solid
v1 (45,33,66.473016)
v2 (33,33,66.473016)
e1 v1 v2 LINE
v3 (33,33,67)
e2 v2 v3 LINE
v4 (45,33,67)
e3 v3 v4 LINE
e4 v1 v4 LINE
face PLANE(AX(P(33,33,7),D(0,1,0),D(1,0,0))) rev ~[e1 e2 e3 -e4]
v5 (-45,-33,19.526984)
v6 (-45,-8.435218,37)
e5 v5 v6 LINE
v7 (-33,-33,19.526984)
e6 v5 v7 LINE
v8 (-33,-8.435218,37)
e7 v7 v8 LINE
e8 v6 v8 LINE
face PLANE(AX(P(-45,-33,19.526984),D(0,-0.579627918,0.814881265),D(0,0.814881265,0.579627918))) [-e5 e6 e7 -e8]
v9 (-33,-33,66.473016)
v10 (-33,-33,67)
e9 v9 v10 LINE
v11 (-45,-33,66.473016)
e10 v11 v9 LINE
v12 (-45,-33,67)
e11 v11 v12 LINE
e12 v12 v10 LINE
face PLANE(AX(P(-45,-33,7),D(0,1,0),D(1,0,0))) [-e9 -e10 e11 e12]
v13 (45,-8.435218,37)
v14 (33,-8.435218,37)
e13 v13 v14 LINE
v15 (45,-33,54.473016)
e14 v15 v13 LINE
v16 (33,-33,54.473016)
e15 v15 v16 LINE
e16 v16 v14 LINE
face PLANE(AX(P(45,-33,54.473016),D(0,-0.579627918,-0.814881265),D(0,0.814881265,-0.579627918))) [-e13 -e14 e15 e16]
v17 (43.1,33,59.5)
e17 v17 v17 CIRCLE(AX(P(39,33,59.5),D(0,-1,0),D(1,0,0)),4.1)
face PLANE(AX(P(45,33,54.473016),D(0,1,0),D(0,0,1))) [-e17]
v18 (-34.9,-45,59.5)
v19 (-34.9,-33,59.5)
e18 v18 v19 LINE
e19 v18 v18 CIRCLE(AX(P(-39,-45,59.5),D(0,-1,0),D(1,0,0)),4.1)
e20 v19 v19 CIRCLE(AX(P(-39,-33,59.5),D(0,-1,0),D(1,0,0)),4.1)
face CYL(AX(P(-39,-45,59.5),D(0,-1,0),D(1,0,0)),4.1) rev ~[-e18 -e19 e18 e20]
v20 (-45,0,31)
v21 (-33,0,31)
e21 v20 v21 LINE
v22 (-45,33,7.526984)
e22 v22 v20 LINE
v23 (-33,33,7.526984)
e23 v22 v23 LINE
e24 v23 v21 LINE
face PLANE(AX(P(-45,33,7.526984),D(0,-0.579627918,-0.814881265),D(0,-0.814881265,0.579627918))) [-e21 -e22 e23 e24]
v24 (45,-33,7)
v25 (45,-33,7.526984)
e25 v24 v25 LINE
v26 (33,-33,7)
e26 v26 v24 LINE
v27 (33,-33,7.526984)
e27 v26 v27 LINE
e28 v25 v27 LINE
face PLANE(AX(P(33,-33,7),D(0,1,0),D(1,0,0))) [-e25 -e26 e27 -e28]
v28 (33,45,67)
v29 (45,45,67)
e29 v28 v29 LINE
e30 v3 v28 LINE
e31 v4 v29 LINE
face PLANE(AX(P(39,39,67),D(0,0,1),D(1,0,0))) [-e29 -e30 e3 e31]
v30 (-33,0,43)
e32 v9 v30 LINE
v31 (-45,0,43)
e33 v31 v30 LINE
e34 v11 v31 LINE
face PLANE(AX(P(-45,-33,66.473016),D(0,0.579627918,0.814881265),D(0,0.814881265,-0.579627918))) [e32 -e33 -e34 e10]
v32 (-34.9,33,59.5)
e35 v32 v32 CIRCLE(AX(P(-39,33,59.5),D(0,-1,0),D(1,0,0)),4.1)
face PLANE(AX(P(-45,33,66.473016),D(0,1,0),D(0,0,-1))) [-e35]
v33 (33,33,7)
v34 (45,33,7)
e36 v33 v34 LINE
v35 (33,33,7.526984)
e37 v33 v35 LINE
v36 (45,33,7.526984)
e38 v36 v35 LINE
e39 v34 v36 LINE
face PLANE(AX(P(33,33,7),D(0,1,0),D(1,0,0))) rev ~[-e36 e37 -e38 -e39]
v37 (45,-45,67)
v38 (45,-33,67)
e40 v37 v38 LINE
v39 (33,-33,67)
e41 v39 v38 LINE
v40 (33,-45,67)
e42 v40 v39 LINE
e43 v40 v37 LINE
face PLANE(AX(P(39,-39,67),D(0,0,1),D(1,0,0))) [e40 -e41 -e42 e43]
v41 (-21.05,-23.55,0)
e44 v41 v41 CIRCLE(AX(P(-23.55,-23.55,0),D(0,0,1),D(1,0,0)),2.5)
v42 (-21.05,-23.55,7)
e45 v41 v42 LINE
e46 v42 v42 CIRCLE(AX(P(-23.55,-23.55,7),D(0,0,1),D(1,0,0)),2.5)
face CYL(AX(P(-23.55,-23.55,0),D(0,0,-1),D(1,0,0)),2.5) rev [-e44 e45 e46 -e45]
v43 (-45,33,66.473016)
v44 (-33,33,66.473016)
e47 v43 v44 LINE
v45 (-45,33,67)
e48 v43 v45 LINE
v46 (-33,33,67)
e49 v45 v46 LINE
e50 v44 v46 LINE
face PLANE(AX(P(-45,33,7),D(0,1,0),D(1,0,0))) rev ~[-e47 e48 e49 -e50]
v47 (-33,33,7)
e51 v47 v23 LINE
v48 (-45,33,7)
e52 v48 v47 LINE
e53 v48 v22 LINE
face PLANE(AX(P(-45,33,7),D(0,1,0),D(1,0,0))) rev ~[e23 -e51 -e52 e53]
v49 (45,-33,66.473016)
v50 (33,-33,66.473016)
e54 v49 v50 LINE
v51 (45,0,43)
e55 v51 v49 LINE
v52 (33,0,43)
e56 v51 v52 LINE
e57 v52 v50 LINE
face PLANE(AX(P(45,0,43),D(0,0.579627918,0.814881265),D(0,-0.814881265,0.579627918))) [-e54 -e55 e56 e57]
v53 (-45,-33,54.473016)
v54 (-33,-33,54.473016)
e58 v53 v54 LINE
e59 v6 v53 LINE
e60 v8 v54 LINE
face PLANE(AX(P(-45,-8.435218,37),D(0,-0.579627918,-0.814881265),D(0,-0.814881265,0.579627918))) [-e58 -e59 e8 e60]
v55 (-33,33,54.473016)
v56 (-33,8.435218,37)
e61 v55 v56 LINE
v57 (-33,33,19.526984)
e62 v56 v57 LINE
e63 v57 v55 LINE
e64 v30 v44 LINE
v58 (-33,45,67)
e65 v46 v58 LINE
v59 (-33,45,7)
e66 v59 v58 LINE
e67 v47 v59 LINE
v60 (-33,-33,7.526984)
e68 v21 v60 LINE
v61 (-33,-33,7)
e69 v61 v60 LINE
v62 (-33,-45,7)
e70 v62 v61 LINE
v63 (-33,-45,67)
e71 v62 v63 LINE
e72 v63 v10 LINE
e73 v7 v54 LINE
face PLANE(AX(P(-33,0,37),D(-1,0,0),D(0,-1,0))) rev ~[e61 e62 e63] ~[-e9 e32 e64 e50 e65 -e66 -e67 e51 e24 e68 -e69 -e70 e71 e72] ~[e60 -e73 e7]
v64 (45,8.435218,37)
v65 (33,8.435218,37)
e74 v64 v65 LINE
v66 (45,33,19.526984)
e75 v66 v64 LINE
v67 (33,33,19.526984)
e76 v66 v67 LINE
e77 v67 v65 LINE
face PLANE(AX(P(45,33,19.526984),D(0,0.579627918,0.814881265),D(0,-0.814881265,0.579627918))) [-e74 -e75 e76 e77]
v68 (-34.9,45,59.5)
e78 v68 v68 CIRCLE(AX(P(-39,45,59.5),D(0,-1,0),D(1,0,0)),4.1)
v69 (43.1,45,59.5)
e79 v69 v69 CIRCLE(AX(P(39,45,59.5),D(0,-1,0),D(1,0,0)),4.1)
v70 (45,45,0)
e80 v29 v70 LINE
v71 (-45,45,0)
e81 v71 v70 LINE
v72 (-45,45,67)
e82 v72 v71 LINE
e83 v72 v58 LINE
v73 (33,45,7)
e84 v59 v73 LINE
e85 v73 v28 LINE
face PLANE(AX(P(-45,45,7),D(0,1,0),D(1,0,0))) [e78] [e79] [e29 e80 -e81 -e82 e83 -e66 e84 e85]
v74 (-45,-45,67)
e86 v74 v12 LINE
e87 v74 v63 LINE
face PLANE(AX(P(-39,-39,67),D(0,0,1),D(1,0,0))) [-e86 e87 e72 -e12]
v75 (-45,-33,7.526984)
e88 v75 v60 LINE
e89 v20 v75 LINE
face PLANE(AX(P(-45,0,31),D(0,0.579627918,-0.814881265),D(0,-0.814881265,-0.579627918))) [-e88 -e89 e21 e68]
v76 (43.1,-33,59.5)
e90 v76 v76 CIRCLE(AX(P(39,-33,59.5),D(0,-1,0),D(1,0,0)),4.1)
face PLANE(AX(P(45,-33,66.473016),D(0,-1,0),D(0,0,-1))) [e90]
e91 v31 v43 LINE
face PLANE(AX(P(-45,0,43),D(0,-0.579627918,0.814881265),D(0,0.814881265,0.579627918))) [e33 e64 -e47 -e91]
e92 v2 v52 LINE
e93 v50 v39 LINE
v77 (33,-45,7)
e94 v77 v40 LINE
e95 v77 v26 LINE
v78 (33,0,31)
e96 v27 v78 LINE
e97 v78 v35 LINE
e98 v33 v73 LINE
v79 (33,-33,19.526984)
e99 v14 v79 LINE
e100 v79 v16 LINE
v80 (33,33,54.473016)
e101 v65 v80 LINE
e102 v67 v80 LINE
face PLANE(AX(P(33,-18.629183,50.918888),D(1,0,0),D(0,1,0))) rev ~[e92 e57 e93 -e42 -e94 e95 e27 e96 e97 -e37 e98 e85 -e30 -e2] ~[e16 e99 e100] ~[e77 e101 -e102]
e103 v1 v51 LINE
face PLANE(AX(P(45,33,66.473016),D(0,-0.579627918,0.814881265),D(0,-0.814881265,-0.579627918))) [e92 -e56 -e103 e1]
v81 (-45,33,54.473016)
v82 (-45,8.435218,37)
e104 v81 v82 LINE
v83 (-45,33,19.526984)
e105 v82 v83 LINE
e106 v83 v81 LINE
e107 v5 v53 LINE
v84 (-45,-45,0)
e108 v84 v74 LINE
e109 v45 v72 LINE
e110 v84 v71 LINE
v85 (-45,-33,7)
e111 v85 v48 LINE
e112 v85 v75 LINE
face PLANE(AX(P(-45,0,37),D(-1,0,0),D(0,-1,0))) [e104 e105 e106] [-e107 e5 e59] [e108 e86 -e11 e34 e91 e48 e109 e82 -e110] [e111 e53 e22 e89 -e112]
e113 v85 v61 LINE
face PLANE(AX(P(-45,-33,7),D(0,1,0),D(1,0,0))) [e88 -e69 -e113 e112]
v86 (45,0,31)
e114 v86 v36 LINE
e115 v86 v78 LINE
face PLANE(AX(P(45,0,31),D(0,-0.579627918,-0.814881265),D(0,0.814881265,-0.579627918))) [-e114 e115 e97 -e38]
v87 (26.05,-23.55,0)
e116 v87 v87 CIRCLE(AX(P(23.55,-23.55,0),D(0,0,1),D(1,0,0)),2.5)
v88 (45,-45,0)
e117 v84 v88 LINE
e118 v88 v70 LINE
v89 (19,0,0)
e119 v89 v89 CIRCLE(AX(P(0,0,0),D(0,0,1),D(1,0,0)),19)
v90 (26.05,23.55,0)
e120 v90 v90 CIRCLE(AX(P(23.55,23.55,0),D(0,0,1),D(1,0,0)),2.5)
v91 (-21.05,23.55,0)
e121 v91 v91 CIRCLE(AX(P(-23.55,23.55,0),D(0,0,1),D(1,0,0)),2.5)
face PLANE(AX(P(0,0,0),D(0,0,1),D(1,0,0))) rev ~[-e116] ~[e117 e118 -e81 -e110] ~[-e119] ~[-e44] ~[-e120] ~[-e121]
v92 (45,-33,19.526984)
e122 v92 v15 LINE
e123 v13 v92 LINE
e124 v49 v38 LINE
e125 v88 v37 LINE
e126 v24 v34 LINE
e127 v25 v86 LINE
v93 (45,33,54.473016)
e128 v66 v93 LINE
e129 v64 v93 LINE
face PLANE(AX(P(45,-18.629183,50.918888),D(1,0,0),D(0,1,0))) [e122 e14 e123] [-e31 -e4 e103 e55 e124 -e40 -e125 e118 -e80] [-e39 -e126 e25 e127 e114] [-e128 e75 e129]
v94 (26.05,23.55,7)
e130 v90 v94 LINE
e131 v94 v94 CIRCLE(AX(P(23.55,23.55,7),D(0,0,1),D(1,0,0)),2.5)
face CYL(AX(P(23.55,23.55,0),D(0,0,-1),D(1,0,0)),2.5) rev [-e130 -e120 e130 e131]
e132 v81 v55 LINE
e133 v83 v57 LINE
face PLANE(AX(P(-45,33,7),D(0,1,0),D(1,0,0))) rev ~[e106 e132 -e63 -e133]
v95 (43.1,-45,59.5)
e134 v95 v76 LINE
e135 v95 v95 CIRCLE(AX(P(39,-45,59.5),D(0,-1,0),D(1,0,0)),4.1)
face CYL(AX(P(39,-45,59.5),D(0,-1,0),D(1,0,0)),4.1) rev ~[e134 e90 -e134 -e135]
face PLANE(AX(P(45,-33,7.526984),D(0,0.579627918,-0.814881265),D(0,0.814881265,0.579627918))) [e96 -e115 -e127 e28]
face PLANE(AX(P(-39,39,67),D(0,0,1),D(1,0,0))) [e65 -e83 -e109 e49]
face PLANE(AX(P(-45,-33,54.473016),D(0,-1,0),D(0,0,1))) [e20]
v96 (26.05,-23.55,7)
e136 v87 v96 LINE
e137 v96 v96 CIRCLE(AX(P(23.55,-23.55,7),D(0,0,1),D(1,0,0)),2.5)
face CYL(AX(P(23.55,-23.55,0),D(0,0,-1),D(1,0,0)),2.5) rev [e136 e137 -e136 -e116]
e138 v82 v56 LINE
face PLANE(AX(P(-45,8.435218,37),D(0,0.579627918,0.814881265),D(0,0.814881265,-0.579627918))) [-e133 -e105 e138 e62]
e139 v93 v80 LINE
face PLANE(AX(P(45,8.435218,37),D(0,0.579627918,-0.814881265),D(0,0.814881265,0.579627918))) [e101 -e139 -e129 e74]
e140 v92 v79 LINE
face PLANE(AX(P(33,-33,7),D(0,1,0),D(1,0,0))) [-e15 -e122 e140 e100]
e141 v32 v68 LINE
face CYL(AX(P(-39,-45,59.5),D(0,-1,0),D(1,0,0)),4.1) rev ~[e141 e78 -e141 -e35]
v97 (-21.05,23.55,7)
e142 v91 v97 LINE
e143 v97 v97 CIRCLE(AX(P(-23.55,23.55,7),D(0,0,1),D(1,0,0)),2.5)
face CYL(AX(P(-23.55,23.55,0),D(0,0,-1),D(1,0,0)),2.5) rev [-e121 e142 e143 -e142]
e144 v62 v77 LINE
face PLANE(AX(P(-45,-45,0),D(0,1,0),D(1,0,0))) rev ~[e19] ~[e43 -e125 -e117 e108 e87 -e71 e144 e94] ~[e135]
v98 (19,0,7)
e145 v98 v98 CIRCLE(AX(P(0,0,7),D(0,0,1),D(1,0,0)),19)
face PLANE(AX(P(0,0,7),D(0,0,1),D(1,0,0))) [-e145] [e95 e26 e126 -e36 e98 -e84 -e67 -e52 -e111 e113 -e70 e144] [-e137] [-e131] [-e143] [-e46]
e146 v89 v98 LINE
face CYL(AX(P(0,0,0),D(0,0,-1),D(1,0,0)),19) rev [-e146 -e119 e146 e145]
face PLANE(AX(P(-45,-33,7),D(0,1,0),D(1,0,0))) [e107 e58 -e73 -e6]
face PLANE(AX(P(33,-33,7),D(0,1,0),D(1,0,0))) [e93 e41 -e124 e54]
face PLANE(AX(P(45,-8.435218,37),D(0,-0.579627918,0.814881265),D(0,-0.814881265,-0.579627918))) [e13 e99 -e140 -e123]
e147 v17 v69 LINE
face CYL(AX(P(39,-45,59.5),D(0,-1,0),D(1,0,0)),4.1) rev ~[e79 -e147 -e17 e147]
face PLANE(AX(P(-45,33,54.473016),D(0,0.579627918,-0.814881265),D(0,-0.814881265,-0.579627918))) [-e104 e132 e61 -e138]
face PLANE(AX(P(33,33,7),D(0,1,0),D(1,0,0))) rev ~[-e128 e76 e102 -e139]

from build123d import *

# Parameters (mm, degrees)
F0_W      = 90
F0_H      = 90
F0_R      = 2.5
F0_R_2    = 19
F1_DEPTH  = 7
F3_W      = 12
F3_H      = 12
F4_DEPTH  = 60
F6_R      = 4.1
F7_DEPTH  = 100
F8_DEPTH  = 25
F12_DEPTH = 12
F15_DEPTH = 12


with BuildPart() as f1:
    # F0 (on Top) → F1 (new body)
    with BuildSketch(Plane.XY):
        Rectangle(F0_W, F0_H)
        with Locations((-23.55, -23.55)):
            Circle(F0_R, mode=Mode.SUBTRACT)
        with Locations((23.55, -23.55)):
            Circle(F0_R, mode=Mode.SUBTRACT)
        with Locations((-23.55, 23.55)):
            Circle(F0_R, mode=Mode.SUBTRACT)
        Circle(F0_R_2, mode=Mode.SUBTRACT)
        with Locations((23.55, 23.55)):
            Circle(F0_R, mode=Mode.SUBTRACT)
    extrude(amount=F1_DEPTH)

    # F3 (on offset) → F4 (join)
    with BuildSketch(Plane.XY.offset(7)):
        with Locations((-39, 39)):
            Rectangle(F3_W, F3_H)
        with Locations((39, 39)):
            Rectangle(F3_W, F3_H)
        with Locations((39, -39)):
            Rectangle(F3_W, F3_H)
        with Locations((-39, -39)):
            Rectangle(F3_W, F3_H)
    extrude(amount=F4_DEPTH)

    # F6 (on offset) → F7 (cut)
    with BuildSketch(Plane.XZ.offset(45)):
        with Locations((-39, 59.5)):
            Circle(F6_R)
        with Locations((39, 59.5)):
            Circle(F6_R)
    extrude(amount=-F7_DEPTH, mode=Mode.SUBTRACT)

    # F0 (on Top) → F8 (cut)
    with BuildSketch(Plane.XY):
        Circle(F0_R_2)
        with Locations((-23.55, 23.55)):
            Circle(F0_R)
        with Locations((23.55, 23.55)):
            Circle(F0_R)
        with Locations((23.55, -23.55)):
            Circle(F0_R)
        with Locations((-23.55, -23.55)):
            Circle(F0_R)
    extrude(amount=-F8_DEPTH, mode=Mode.SUBTRACT)

    # F11 (on face) → F12 (join)
    with BuildSketch(Plane.YZ.offset(45)):
        Polygon((0, 43), (-33, 66.4730164111), (-33, 54.4730164111), (-8.4352175508, 37), align=None)
        Polygon((33, 66.4730164111), (0, 43), (8.4352175508, 37), (33, 54.4730164111), align=None)
        Polygon((33, 19.5269835889), (8.4352175508, 37), (0, 31), (33, 7.5269835889), align=None)
        Polygon((0, 31), (-8.4352175508, 37), (-33, 19.5269835889), (-33, 7.5269835889), align=None)
        Polygon((8.4352175508, 37), (0, 43), (-8.4352175508, 37), (0, 31), align=None)
    extrude(amount=-F12_DEPTH)

    # F14 (on offset) → F15 (join)
    with BuildSketch(Plane(origin=(-45, 0, 0), x_dir=(0, -1, 0), z_dir=(-1, 0, 0))):
        Polygon((0, 43), (-33, 66.4730164111), (-33, 54.4730164111), (-8.4352175508, 37), (-33, 19.5269835889), (-33, 7.5269835889), (0, 31), (33, 7.5269835889), (33, 19.5269835889), (8.4352175508, 37), (33, 54.4730164111), (33, 66.4730164111), align=None)
    extrude(amount=-F15_DEPTH)


solid = f1.part
